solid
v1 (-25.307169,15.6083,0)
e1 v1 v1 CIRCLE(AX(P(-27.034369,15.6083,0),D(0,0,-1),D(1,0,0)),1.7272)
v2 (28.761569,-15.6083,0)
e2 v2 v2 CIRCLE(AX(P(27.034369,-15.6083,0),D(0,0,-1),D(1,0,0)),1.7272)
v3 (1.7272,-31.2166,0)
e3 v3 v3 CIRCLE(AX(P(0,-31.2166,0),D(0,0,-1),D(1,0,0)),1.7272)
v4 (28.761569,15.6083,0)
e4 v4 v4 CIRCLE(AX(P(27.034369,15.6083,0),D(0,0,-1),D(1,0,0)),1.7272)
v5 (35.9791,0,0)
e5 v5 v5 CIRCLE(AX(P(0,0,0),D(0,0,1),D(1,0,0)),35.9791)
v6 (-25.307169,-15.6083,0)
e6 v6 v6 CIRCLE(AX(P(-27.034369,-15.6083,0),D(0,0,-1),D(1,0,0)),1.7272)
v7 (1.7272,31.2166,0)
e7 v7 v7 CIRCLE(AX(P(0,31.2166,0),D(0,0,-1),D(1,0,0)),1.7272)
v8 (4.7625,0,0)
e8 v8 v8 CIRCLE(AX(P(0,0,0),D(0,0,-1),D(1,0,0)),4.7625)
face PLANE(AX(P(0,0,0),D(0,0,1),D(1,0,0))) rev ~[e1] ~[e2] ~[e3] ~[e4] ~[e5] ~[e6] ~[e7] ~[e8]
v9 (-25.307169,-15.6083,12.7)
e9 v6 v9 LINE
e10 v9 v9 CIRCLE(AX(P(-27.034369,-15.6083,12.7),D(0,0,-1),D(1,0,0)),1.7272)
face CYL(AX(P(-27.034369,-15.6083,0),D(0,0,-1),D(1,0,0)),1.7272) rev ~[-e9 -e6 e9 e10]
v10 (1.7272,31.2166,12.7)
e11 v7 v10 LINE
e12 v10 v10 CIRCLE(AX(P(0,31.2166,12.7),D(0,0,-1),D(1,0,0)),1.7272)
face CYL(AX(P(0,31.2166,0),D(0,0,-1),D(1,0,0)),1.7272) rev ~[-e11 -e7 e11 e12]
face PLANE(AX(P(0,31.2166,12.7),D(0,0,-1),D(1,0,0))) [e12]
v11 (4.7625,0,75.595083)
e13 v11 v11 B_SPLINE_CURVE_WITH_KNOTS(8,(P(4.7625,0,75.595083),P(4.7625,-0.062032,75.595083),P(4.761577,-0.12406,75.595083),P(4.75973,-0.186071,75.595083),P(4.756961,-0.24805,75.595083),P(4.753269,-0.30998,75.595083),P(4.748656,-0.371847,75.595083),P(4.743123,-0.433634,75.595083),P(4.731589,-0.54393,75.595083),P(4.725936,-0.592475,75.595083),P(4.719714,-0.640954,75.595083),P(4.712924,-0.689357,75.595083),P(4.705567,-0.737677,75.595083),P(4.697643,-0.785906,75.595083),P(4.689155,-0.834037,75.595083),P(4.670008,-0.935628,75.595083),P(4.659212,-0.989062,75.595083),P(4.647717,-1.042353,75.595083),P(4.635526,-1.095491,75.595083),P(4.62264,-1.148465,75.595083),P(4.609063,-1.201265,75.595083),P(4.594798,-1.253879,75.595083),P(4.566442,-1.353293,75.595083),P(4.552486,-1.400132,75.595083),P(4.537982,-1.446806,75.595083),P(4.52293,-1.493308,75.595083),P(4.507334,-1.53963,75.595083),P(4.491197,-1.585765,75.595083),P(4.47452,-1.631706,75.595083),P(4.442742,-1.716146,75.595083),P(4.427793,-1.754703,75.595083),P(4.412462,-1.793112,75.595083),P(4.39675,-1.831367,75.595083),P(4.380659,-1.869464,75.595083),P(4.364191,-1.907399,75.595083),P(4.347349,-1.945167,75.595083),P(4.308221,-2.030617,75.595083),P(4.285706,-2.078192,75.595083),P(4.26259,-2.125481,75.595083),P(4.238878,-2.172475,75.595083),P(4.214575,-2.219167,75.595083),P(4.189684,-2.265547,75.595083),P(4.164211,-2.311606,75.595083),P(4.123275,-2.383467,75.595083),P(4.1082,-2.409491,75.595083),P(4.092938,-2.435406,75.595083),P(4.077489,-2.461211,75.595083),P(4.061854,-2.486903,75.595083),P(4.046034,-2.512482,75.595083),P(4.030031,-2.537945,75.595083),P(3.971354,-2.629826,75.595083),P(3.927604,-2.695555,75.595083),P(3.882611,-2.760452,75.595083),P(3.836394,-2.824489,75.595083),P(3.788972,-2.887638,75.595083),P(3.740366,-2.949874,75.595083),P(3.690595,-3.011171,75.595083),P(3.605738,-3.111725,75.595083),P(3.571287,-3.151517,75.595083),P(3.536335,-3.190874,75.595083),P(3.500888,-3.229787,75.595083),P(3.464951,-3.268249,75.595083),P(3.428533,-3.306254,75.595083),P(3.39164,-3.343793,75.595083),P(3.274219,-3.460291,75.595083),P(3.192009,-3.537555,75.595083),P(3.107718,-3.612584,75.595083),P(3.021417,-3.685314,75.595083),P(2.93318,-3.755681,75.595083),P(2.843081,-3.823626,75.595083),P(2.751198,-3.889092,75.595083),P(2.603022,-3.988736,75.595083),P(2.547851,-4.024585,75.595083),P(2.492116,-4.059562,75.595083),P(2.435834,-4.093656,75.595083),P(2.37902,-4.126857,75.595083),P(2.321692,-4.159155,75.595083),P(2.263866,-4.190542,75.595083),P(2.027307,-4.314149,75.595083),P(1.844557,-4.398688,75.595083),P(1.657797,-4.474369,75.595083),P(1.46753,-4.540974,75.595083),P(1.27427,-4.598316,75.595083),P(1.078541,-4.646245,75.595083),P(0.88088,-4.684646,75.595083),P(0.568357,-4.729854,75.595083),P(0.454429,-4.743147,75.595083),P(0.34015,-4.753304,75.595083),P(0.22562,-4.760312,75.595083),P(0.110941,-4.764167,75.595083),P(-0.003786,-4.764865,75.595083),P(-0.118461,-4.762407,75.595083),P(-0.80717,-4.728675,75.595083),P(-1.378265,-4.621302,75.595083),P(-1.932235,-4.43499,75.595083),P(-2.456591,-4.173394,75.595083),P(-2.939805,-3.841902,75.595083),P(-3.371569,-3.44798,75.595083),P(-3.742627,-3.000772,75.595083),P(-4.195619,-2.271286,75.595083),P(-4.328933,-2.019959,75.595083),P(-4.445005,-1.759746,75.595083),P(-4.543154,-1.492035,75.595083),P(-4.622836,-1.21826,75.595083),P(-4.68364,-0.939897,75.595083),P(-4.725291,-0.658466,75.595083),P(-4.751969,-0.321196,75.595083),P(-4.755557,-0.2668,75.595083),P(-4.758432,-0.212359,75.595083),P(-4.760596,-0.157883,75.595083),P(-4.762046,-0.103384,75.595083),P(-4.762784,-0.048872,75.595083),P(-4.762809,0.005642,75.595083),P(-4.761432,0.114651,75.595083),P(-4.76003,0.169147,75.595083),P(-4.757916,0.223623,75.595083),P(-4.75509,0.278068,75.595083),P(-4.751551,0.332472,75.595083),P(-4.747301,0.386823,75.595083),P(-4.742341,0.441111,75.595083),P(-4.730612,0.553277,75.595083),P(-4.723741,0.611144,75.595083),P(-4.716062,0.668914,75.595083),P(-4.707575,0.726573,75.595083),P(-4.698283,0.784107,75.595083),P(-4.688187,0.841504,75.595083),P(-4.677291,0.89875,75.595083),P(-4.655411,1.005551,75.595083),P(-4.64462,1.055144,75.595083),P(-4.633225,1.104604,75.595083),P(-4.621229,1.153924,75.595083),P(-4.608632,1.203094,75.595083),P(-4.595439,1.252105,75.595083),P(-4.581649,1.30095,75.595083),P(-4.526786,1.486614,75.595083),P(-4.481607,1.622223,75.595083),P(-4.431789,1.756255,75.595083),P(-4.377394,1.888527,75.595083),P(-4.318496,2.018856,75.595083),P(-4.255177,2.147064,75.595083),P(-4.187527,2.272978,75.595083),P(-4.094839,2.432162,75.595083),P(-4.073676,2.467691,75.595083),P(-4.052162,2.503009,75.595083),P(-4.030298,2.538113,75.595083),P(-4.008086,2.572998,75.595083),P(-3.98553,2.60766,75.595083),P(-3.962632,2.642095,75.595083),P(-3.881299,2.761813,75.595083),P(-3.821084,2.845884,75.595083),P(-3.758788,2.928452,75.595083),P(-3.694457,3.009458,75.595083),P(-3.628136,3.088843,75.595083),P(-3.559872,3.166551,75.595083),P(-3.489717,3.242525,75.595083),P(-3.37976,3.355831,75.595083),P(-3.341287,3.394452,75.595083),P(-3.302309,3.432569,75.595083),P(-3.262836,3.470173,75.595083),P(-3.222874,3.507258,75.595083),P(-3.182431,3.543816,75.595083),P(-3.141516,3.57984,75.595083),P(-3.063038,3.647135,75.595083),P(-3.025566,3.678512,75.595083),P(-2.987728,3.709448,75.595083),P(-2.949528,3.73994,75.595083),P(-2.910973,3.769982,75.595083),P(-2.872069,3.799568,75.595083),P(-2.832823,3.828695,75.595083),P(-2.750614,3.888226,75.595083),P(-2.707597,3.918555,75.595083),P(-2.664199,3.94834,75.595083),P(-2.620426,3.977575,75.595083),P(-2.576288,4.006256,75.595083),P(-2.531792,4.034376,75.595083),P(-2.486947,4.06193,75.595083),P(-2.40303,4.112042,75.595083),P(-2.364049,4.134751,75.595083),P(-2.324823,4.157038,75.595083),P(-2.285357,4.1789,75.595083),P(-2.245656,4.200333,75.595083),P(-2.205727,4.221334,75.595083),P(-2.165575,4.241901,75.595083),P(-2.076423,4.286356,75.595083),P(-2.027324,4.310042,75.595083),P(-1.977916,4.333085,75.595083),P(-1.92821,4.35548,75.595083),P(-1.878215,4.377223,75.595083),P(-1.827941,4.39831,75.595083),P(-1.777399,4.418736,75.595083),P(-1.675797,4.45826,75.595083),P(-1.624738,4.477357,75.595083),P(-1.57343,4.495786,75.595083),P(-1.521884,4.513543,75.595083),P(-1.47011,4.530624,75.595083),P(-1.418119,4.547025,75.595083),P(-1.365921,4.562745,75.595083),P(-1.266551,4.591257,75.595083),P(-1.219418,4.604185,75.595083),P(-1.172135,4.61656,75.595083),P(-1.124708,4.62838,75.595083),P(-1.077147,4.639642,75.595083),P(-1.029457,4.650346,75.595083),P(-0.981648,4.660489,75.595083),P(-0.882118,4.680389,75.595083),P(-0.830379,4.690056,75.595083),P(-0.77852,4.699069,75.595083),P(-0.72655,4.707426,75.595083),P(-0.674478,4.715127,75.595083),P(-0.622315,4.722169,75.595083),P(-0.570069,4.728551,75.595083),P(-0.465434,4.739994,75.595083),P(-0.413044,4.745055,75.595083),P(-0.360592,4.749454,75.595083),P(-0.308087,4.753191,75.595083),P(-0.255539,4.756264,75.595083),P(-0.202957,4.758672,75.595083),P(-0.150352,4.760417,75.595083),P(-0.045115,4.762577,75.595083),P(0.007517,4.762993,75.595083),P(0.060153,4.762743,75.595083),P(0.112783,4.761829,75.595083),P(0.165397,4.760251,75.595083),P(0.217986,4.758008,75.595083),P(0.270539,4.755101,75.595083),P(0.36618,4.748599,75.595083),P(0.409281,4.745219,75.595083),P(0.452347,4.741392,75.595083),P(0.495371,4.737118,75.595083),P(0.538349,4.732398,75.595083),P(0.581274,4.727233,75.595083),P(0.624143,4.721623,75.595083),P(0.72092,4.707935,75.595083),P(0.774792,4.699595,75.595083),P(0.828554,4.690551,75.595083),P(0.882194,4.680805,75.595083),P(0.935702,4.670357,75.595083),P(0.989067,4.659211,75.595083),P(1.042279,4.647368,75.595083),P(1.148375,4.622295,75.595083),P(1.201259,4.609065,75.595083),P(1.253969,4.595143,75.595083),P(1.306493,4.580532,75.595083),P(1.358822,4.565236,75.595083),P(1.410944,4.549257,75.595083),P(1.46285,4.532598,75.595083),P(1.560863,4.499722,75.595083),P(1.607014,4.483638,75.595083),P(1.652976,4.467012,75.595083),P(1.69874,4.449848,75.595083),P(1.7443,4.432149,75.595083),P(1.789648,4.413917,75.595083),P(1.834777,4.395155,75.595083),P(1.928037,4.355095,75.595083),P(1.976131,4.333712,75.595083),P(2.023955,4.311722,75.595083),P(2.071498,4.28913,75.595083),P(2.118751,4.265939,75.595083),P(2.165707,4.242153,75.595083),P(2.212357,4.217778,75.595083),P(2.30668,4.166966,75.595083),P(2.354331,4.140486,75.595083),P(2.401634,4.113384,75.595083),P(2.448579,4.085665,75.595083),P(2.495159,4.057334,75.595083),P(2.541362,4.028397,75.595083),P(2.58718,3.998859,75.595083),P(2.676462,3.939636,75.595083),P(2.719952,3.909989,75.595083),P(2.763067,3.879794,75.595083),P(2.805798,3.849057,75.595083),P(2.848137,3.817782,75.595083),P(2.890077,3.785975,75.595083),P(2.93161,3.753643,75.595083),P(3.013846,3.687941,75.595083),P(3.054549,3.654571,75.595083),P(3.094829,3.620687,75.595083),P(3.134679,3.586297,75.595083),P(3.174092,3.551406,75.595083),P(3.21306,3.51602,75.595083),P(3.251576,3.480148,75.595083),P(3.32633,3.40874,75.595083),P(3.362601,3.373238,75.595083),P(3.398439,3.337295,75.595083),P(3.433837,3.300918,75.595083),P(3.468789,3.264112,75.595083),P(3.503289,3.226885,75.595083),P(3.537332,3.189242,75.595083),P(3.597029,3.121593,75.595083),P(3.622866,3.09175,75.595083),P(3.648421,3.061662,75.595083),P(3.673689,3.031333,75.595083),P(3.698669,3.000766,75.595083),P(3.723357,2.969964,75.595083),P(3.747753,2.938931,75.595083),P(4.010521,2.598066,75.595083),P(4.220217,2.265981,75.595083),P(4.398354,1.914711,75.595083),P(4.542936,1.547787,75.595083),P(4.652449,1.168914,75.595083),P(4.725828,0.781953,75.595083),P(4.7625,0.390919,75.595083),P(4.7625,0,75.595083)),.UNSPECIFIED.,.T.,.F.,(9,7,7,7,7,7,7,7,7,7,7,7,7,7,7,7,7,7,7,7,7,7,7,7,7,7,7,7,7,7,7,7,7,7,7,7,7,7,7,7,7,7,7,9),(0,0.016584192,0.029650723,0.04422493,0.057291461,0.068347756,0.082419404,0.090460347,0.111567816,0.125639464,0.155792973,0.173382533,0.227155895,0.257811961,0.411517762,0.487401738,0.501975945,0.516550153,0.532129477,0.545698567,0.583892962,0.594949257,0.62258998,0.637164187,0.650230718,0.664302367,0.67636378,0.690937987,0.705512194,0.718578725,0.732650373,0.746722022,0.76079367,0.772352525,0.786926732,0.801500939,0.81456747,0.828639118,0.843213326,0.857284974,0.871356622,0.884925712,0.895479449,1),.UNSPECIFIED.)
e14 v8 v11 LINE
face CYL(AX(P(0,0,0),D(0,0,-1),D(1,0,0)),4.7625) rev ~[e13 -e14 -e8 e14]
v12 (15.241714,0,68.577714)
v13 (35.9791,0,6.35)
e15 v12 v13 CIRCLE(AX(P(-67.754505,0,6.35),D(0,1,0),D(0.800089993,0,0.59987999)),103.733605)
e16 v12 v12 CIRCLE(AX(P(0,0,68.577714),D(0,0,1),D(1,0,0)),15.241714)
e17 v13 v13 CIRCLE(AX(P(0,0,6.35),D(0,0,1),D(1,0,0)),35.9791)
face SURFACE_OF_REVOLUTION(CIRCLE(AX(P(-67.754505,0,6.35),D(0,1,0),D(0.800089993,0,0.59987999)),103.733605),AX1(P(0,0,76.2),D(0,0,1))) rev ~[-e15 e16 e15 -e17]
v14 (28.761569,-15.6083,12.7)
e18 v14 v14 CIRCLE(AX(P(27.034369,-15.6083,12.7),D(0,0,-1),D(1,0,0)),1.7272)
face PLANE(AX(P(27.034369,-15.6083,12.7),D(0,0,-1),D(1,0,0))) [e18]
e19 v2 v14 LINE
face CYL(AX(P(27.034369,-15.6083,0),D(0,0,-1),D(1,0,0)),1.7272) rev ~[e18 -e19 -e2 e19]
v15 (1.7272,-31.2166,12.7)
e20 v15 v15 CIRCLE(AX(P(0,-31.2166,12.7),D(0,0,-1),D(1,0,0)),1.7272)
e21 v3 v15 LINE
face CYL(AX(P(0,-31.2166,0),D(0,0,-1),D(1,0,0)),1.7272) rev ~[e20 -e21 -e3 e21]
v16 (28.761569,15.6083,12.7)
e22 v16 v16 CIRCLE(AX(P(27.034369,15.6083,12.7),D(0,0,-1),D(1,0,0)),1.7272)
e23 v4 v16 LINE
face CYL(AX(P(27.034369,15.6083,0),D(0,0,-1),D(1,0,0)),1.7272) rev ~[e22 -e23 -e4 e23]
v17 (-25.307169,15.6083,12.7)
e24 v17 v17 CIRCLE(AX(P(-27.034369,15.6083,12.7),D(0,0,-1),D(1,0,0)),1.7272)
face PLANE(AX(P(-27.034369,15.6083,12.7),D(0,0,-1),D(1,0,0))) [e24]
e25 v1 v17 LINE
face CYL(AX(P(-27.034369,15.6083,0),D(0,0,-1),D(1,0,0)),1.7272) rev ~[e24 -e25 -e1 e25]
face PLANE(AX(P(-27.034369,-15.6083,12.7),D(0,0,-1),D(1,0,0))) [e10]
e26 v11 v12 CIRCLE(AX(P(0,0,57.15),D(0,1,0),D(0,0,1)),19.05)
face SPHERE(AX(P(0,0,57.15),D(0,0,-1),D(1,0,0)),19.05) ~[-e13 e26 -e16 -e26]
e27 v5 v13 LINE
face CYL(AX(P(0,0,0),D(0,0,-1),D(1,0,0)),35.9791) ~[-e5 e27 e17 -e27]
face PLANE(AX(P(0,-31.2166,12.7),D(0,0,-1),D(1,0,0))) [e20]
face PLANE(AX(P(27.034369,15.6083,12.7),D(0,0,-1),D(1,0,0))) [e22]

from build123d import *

# Parameters (mm, degrees)
F0_R     = 35.9791
F1_DEPTH = 76.2
F4_R     = 4.7625
F5_DEPTH = 156
F6_R     = 1.7272
F7_DEPTH = 12.7


# Not quite as in the source:
# - an extrude ends at something that could not be found from the text; its depth is read off the source's solid


with BuildPart() as f1:
    # F0 (on Top) → F1 (new body)
    with BuildSketch(Plane.XY):
        Circle(F0_R)
    extrude(amount=F1_DEPTH)

    # F2 (on Front) → F3 (revolve, cut)
    with BuildSketch(Plane.XZ):
        with BuildLine():
            ThreePointArc((0, 76.2), (8.5206969151, 74.1881989682), (15.2417143714, 68.5777138143))
            ThreePointArc((15.2417143714, 68.5777138143), (30.6582935654, 39.1460650432), (35.9791, 6.35))
            Line((35.9791, 6.35), (71.9582, 6.35))
            Line((71.9582, 6.35), (71.9582, 112.1791))
            Line((71.9582, 112.1791), (0, 112.1791))
            Line((0, 112.1791), (0, 76.2))
        make_face()
    revolve(axis=Axis((0, 0, 76.2), (0, 0, 1)), mode=Mode.SUBTRACT)

    # F4 (on face) → F5 (cut, through all)
    with BuildSketch(Plane(origin=(0, 0, 0), x_dir=(1, 0, 0), z_dir=(0, 0, -1))):
        Circle(F4_R)
    extrude(amount=-F5_DEPTH, mode=Mode.SUBTRACT)

    # F6 (on face) → F7 (cut)
    with BuildSketch(Plane(origin=(0, 0, 0), x_dir=(1, 0, 0), z_dir=(0, 0, -1))):
        with Locations((-27.0343686198, -15.6083)):
            Circle(F6_R)
        with Locations((-27.0343686198, 15.6083)):
            Circle(F6_R)
        with Locations((0, 31.2166)):
            Circle(F6_R)
        with Locations((27.0343686198, 15.6083)):
            Circle(F6_R)
        with Locations((27.0343686198, -15.6083)):
            Circle(F6_R)
        with Locations((0, -31.2166)):
            Circle(F6_R)
    extrude(amount=-F7_DEPTH, mode=Mode.SUBTRACT)


solid = f1.part
